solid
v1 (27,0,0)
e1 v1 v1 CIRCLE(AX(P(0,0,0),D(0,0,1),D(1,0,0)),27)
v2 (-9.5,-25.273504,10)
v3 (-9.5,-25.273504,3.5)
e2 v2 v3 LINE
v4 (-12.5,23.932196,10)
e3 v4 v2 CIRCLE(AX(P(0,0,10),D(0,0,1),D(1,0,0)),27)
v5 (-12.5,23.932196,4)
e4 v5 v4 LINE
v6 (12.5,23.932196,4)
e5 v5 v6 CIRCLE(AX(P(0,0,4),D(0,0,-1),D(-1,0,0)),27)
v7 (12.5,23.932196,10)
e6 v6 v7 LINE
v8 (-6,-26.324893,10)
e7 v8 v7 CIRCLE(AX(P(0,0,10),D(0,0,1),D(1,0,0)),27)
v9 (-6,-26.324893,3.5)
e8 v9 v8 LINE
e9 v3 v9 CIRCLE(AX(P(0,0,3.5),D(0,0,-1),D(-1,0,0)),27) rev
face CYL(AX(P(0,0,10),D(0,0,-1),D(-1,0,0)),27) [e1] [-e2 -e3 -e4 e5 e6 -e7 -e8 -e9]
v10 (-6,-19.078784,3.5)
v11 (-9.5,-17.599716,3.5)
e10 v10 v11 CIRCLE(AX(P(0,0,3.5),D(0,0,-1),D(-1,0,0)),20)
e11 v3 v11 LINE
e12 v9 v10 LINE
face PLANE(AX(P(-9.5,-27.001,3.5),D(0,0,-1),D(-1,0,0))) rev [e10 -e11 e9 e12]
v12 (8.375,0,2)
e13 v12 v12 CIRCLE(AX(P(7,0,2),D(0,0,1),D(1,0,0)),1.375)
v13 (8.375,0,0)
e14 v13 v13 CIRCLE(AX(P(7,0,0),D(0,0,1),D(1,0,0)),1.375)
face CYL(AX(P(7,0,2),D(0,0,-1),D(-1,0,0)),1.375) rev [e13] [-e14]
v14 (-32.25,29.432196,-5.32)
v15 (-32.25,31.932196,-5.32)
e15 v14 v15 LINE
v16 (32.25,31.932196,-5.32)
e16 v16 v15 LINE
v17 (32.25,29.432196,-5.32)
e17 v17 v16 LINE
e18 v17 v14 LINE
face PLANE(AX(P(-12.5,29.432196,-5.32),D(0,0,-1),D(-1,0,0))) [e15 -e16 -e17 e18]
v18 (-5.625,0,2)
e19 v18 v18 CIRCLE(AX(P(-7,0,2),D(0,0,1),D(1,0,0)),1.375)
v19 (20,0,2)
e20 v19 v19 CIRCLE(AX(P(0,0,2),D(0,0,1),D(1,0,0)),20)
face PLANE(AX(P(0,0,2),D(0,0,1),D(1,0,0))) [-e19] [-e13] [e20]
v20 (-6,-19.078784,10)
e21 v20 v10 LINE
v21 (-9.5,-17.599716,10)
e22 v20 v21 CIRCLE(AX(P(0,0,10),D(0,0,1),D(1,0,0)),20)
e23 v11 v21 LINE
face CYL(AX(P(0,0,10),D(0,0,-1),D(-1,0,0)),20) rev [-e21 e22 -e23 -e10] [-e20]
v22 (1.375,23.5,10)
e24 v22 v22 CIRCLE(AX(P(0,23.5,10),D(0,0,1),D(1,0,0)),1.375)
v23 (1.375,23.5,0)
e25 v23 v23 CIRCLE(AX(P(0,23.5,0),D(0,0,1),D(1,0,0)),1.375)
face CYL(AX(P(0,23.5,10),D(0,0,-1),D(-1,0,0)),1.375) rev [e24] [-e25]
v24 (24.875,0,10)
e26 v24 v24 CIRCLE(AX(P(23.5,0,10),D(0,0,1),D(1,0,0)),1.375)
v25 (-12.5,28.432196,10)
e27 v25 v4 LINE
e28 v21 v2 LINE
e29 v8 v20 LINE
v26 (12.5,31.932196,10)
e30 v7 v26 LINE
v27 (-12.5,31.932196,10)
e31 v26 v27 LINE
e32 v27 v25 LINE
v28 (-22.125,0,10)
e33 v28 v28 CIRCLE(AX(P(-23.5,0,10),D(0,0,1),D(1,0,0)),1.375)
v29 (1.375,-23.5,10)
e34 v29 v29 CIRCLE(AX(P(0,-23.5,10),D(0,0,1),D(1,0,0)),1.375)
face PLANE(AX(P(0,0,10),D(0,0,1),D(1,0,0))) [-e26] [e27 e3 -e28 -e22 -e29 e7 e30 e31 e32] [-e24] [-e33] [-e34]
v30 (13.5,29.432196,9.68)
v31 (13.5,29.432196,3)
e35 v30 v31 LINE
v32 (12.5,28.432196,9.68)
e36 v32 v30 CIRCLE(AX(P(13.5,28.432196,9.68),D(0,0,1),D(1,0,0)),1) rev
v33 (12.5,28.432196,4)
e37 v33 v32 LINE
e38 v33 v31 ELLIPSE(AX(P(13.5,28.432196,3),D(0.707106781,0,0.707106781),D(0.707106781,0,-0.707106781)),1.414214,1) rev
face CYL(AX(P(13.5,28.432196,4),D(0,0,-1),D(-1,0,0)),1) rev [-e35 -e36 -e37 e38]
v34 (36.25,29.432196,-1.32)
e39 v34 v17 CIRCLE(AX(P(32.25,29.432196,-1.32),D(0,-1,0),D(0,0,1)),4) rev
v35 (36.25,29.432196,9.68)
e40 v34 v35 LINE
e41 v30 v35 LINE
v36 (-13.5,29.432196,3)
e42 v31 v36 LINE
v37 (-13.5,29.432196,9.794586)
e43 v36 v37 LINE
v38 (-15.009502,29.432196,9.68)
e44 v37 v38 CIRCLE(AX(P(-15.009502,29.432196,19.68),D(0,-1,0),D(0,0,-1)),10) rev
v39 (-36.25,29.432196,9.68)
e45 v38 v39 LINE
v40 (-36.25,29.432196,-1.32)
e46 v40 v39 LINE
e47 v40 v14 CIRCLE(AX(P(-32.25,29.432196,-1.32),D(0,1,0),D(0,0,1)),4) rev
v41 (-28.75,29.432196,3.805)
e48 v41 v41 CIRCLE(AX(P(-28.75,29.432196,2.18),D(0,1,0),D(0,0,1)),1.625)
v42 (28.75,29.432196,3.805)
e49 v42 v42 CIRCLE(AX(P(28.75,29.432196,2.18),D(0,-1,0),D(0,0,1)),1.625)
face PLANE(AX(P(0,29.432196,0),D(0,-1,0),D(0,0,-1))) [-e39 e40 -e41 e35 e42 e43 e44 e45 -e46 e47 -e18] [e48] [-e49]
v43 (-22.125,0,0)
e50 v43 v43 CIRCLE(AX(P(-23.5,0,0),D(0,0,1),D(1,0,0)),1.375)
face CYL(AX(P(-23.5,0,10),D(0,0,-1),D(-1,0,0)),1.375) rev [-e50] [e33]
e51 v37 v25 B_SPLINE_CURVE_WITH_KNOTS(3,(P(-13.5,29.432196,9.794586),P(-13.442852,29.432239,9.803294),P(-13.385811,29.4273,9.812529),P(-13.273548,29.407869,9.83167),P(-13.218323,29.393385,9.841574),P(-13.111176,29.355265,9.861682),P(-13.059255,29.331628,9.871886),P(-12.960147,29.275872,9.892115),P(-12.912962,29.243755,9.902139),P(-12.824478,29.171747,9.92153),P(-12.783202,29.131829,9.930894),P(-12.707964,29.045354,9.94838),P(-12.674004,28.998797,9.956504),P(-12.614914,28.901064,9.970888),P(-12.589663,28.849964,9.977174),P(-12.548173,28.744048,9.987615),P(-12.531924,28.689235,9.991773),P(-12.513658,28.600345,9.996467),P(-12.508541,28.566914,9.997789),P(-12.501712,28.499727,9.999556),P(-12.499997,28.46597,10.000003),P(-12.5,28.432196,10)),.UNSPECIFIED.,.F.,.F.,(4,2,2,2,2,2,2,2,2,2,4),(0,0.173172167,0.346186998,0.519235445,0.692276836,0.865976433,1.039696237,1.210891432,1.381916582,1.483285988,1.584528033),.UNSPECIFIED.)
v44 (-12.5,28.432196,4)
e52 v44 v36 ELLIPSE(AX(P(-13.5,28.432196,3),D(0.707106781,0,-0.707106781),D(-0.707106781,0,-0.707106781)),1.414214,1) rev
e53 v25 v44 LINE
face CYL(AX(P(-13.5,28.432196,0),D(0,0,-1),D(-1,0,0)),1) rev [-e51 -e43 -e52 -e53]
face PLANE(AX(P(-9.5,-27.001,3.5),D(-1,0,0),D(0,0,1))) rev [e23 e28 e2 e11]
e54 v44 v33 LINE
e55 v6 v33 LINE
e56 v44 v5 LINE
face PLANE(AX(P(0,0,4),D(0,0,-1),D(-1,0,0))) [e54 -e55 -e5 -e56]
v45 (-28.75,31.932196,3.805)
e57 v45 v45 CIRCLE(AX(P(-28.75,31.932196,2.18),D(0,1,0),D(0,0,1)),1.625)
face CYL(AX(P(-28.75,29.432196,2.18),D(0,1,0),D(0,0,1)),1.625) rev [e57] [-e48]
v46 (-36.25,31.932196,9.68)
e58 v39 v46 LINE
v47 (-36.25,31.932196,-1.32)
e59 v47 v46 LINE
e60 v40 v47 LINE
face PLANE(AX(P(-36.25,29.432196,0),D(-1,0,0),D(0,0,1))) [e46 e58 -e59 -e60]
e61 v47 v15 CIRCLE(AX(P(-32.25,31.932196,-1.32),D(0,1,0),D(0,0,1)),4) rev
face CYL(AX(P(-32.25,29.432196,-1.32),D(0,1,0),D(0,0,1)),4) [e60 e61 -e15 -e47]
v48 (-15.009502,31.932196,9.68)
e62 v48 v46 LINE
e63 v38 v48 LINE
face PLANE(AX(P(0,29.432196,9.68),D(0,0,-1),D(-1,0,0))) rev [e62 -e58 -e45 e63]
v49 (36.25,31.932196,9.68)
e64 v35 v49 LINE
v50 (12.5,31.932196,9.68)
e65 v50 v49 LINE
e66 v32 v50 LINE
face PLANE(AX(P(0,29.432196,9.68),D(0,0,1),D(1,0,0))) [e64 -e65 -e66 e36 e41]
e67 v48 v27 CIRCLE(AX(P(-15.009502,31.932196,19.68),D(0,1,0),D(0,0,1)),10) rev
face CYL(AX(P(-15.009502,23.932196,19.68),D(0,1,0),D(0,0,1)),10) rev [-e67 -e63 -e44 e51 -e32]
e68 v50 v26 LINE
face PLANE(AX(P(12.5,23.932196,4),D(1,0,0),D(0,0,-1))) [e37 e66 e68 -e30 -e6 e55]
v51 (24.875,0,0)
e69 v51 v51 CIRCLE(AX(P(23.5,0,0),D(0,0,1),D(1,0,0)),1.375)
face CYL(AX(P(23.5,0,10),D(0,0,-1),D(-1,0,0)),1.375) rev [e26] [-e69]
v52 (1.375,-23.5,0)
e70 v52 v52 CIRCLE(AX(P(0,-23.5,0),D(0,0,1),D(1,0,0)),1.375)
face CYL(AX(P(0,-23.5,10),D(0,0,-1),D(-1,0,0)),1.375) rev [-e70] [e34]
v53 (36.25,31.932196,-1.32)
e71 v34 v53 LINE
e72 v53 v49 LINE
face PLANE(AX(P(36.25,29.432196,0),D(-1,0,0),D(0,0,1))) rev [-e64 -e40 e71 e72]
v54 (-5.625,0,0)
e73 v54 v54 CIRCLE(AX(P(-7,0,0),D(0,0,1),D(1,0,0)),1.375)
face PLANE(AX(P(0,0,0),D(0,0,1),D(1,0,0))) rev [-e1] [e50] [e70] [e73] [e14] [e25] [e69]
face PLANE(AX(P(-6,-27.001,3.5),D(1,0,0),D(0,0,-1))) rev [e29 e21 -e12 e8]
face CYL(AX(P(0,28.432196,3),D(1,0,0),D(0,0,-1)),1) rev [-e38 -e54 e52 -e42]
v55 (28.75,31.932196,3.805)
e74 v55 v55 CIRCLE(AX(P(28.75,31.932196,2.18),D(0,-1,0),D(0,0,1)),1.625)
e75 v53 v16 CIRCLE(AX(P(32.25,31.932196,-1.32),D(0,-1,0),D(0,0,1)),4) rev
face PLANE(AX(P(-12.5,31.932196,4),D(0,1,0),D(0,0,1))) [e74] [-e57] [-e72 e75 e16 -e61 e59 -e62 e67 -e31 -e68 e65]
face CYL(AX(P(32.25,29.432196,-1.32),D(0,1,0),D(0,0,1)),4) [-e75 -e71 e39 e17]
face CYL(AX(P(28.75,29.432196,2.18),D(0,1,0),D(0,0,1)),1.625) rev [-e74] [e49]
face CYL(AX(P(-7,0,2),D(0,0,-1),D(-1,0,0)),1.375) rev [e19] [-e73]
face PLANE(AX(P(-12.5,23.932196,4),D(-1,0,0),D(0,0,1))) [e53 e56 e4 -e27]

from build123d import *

# Parameters (mm, degrees)
SKETCH1_R               = 27
SKETCH1_R_2             = 1.375
SKETCH1_R_3             = 20
BOSS_EXTRUDE1_DEPTH     = 10
SKETCH3_R               = 20
SKETCH3_R_2             = 1.375
BOSS_EXTRUDE2_DEPTH     = 2
BOSS_EXTRUDE3_DEPTH     = 6
CUT_EXTRUDE1_REACH      = 44.996
CUT_EXTRUDE1_END_RADIUS = 27
SKETCH4_W               = 3.5
SKETCH4_H               = 9.337272122
SKETCH6_W               = 25
SKETCH6_H               = 15.32
BOSS_EXTRUDE4_DEPTH     = 2.5
SKETCH7_R               = 1.625
BOSS_EXTRUDE5_DEPTH     = 2.5
FILLET2_R               = 10
FILLET3_R               = 1


with BuildPart() as part:
    # Sketch1 → Boss-Extrude1 (new body)
    with BuildSketch(Plane.XY):
        Circle(SKETCH1_R)
        with Locations((0, 23.5)):
            Circle(SKETCH1_R_2, mode=Mode.SUBTRACT)
        with Locations((23.5, 0)):
            Circle(SKETCH1_R_2, mode=Mode.SUBTRACT)
        with Locations((0, -23.5)):
            Circle(SKETCH1_R_2, mode=Mode.SUBTRACT)
        with Locations((-23.5, 0)):
            Circle(SKETCH1_R_2, mode=Mode.SUBTRACT)
        Circle(SKETCH1_R_3, mode=Mode.SUBTRACT)
    extrude(amount=BOSS_EXTRUDE1_DEPTH)

    # Sketch3 → Boss-Extrude2 (add)
    with BuildSketch(Plane.XY):
        Circle(SKETCH3_R)
        with Locations((-7, 0)):
            Circle(SKETCH3_R_2, mode=Mode.SUBTRACT)
        with Locations((7, 0)):
            Circle(SKETCH3_R_2, mode=Mode.SUBTRACT)
    extrude(amount=BOSS_EXTRUDE2_DEPTH)

    # Sketch5 → Boss-Extrude3 (add)
    with BuildSketch(Plane.XY.offset(10)):
        Polygon((-12.5, 23.932195888), (-4.251935746, 23.932195888), (0, 26.25446737), (4.267780323, 23.932195888), (12.5, 23.932195888), (12.5, 31.932195888), (-12.5, 31.932195888), align=None)
    extrude(amount=-BOSS_EXTRUDE3_DEPTH)

    # Cut-Extrude1: up to this cylinder (the profile starts inside it)
    cut_extrude1_end = Plane(origin=(0, 0, 8.168636), z_dir=(0, 0, -1)) * Cylinder(CUT_EXTRUDE1_END_RADIUS, 144.992, mode=Mode.PRIVATE)
    # Sketch4 → Cut-Extrude1 (cut, up to the surface)
    with BuildSketch(Plane(origin=(0, 0, 0), x_dir=(1, 0, 0), z_dir=(0, 1, 0)), mode=Mode.PRIVATE) as cut_extrude1_sk1:
        with Locations((-7.75, -8.168636061)):
            Rectangle(SKETCH4_W, SKETCH4_H)
    cut_extrude1_tool1 = extrude(cut_extrude1_sk1.sketch, amount=-CUT_EXTRUDE1_REACH, mode=Mode.PRIVATE) & cut_extrude1_end
    add(cut_extrude1_tool1.solids().sort_by_distance((-7.75, 0, 8.168636))[0], mode=Mode.SUBTRACT)

    # Sketch6 → Boss-Extrude4 (add)
    with BuildSketch(Plane(origin=(0, 31.932195888, 0), x_dir=(1, 0, 0), z_dir=(0, 1, 0))):
        with Locations((0, -2.34)):
            Rectangle(SKETCH6_W, SKETCH6_H)
    boss_extrude4 = extrude(amount=-BOSS_EXTRUDE4_DEPTH)

    # Sketch7 → Boss-Extrude5 (add)
    with BuildSketch(Plane(origin=(0, 31.932195888, 0), x_dir=(1, 0, 0), z_dir=(0, 1, 0))):
        with BuildLine():
            Line((-36.25, -9.68), (-28.75, -9.68))
            Line((-28.75, -9.68), (0, -9.68))
            Line((0, -9.68), (0, 5.32))
            Line((0, 5.32), (-32.25, 5.32))
            ThreePointArc((-32.25, 5.32), (-35.078427125, 4.148427125), (-36.25, 1.32))
            Line((-36.25, 1.32), (-36.25, -2.18))
            Line((-36.25, -2.18), (-36.25, -9.68))
        make_face()
        with Locations(Location((-28.75, -2.18, 0), (0, 0, 270))):
            Circle(SKETCH7_R, mode=Mode.SUBTRACT)
    boss_extrude5 = extrude(amount=-BOSS_EXTRUDE5_DEPTH)

    # Fillet2
    # the kernel refuses this fillet: 10 mm, written as the material it adds along each edge
    with BuildSketch(Plane(origin=(-12.5, 29.432195888, 9.68), x_dir=(-1, 0, 0), z_dir=(0, 1, 0))) as fillet2_piece_1:
        with BuildLine():
            CenterArc((2.509501943, 10), FILLET2_R, 255.466253099, 14.533746901)
            Line((0, 0.32), (-0.050190039, 0.1264))
            ThreePointArc((-0.050190039, 0.1264), (-0.2, 0.16), (-0.2, 0))
            Line((-0.2, 0), (0, -0.2))
            Line((0, -0.2), (2.509501943, -0.2))
            Line((2.509501943, -0.2), (2.509501943, 0))
        make_face()
    extrude(amount=2.5)

    # Mirror1: Boss-Extrude4, Boss-Extrude5 across plane
    add(boss_extrude4.mirror(Plane(origin=(0, 0, 0), x_dir=(0, 0, 1), z_dir=(1, 0, 0))))
    add(boss_extrude5.mirror(Plane(origin=(0, 0, 0), x_dir=(0, 0, 1), z_dir=(1, 0, 0))))

    # Fillet3
    # the kernel refuses this fillet: 1 mm, written as the material it adds along each edge
    with BuildSketch(Plane(origin=(-12.5, 29.432195888, 4), x_dir=(0, -1, 0), z_dir=(0, 0, 1))) as fillet3_piece_1_section:
        with BuildLine():
            CenterArc((FILLET3_R, -FILLET3_R), FILLET3_R, 90, 90)
            Line((0, -FILLET3_R), (0, 0))
            Line((0, 0), (FILLET3_R, 0))
        make_face()
    fillet3_piece_1 = extrude(amount=6, mode=Mode.PRIVATE)
    fillet3_piece_1 = fillet3_piece_1 - Plane(origin=(-15.009501943, 29.204760134, 19.68), x_dir=(-1, 0, 0), z_dir=(0, -1, 0)) * Cylinder(10, 16, mode=Mode.PRIVATE)
    add(fillet3_piece_1)
    with BuildSketch(Plane(origin=(12.5, 29.432195888, 9.68), x_dir=(0, -1, 0), z_dir=(0, 0, -1))) as fillet3_piece_2:
        with BuildLine():
            CenterArc((FILLET3_R, -FILLET3_R), FILLET3_R, 90, 90)
            Line((0, -FILLET3_R), (0, 0))
            Line((0, 0), (FILLET3_R, 0))
        make_face()
    extrude(amount=5.68)
    with BuildSketch(Plane(origin=(12.5, 29.432195888, 4), x_dir=(0, -1, 0), z_dir=(-1, 0, 0))) as fillet3_piece_3:
        with BuildLine():
            CenterArc((FILLET3_R, -FILLET3_R), FILLET3_R, 90, 90)
            Line((0, -FILLET3_R), (0, 0))
            Line((0, 0), (FILLET3_R, 0))
        make_face()
    extrude(amount=25)
    with BuildSketch(Plane(origin=(-12.5, 29.432195888, 1.5), x_dir=(0, -1, 0), z_dir=(0, 0, 1))) as fillet3_piece_4a_section:
        with BuildLine():
            CenterArc((FILLET3_R, -FILLET3_R), FILLET3_R, 90, 90)
            Line((0, -FILLET3_R), (0, 0))
            Line((0, 0), (FILLET3_R, 0))
        make_face()
    fillet3_piece_4a = extrude(amount=8.5, mode=Mode.PRIVATE)
    fillet3_piece_4a = split(fillet3_piece_4a, bisect_by=Plane(origin=(-12.726395114, 29.205800773, 4), z_dir=(0, 0, -1)), keep=Keep.TOP, mode=Mode.PRIVATE)
    with BuildSketch(Plane(origin=(12.5, 29.432195888, 4), x_dir=(0, -1, 0), z_dir=(-1, 0, 0))) as fillet3_piece_4b_section:
        with BuildLine():
            CenterArc((FILLET3_R, -FILLET3_R), FILLET3_R, 90, 90)
            Line((0, -FILLET3_R), (0, 0))
            Line((0, 0), (FILLET3_R, 0))
        make_face()
    fillet3_piece_4b = extrude(amount=27.5, mode=Mode.PRIVATE)
    fillet3_piece_4b = split(fillet3_piece_4b, bisect_by=Plane(origin=(-12.5, 29.205800773, 3.773604886), z_dir=(-1, 0, 0)), keep=Keep.TOP, mode=Mode.PRIVATE)
    fillet3_piece_4 = fillet3_piece_4a & fillet3_piece_4b
    add(fillet3_piece_4)
    with BuildSketch(Plane(origin=(12.5, 29.432195888, 9.68), x_dir=(0, -1, 0), z_dir=(0, 0, -1))) as fillet3_piece_5a_section:
        with BuildLine():
            CenterArc((FILLET3_R, -FILLET3_R), FILLET3_R, 90, 90)
            Line((0, -FILLET3_R), (0, 0))
            Line((0, 0), (FILLET3_R, 0))
        make_face()
    fillet3_piece_5a = extrude(amount=8.18, mode=Mode.PRIVATE)
    fillet3_piece_5a = split(fillet3_piece_5a, bisect_by=Plane(origin=(12.726395114, 29.205800773, 4), z_dir=(0, 0, -1)), keep=Keep.TOP, mode=Mode.PRIVATE)
    with BuildSketch(Plane(origin=(15, 29.432195888, 4), x_dir=(0, -1, 0), z_dir=(-1, 0, 0))) as fillet3_piece_5b_section:
        with BuildLine():
            CenterArc((FILLET3_R, -FILLET3_R), FILLET3_R, 90, 90)
            Line((0, -FILLET3_R), (0, 0))
            Line((0, 0), (FILLET3_R, 0))
        make_face()
    fillet3_piece_5b = extrude(amount=27.5, mode=Mode.PRIVATE)
    fillet3_piece_5b = split(fillet3_piece_5b, bisect_by=Plane(origin=(12.5, 29.205800773, 3.773604886), z_dir=(1, 0, 0)), keep=Keep.TOP, mode=Mode.PRIVATE)
    fillet3_piece_5 = fillet3_piece_5a & fillet3_piece_5b
    add(fillet3_piece_5)


solid = part.part
